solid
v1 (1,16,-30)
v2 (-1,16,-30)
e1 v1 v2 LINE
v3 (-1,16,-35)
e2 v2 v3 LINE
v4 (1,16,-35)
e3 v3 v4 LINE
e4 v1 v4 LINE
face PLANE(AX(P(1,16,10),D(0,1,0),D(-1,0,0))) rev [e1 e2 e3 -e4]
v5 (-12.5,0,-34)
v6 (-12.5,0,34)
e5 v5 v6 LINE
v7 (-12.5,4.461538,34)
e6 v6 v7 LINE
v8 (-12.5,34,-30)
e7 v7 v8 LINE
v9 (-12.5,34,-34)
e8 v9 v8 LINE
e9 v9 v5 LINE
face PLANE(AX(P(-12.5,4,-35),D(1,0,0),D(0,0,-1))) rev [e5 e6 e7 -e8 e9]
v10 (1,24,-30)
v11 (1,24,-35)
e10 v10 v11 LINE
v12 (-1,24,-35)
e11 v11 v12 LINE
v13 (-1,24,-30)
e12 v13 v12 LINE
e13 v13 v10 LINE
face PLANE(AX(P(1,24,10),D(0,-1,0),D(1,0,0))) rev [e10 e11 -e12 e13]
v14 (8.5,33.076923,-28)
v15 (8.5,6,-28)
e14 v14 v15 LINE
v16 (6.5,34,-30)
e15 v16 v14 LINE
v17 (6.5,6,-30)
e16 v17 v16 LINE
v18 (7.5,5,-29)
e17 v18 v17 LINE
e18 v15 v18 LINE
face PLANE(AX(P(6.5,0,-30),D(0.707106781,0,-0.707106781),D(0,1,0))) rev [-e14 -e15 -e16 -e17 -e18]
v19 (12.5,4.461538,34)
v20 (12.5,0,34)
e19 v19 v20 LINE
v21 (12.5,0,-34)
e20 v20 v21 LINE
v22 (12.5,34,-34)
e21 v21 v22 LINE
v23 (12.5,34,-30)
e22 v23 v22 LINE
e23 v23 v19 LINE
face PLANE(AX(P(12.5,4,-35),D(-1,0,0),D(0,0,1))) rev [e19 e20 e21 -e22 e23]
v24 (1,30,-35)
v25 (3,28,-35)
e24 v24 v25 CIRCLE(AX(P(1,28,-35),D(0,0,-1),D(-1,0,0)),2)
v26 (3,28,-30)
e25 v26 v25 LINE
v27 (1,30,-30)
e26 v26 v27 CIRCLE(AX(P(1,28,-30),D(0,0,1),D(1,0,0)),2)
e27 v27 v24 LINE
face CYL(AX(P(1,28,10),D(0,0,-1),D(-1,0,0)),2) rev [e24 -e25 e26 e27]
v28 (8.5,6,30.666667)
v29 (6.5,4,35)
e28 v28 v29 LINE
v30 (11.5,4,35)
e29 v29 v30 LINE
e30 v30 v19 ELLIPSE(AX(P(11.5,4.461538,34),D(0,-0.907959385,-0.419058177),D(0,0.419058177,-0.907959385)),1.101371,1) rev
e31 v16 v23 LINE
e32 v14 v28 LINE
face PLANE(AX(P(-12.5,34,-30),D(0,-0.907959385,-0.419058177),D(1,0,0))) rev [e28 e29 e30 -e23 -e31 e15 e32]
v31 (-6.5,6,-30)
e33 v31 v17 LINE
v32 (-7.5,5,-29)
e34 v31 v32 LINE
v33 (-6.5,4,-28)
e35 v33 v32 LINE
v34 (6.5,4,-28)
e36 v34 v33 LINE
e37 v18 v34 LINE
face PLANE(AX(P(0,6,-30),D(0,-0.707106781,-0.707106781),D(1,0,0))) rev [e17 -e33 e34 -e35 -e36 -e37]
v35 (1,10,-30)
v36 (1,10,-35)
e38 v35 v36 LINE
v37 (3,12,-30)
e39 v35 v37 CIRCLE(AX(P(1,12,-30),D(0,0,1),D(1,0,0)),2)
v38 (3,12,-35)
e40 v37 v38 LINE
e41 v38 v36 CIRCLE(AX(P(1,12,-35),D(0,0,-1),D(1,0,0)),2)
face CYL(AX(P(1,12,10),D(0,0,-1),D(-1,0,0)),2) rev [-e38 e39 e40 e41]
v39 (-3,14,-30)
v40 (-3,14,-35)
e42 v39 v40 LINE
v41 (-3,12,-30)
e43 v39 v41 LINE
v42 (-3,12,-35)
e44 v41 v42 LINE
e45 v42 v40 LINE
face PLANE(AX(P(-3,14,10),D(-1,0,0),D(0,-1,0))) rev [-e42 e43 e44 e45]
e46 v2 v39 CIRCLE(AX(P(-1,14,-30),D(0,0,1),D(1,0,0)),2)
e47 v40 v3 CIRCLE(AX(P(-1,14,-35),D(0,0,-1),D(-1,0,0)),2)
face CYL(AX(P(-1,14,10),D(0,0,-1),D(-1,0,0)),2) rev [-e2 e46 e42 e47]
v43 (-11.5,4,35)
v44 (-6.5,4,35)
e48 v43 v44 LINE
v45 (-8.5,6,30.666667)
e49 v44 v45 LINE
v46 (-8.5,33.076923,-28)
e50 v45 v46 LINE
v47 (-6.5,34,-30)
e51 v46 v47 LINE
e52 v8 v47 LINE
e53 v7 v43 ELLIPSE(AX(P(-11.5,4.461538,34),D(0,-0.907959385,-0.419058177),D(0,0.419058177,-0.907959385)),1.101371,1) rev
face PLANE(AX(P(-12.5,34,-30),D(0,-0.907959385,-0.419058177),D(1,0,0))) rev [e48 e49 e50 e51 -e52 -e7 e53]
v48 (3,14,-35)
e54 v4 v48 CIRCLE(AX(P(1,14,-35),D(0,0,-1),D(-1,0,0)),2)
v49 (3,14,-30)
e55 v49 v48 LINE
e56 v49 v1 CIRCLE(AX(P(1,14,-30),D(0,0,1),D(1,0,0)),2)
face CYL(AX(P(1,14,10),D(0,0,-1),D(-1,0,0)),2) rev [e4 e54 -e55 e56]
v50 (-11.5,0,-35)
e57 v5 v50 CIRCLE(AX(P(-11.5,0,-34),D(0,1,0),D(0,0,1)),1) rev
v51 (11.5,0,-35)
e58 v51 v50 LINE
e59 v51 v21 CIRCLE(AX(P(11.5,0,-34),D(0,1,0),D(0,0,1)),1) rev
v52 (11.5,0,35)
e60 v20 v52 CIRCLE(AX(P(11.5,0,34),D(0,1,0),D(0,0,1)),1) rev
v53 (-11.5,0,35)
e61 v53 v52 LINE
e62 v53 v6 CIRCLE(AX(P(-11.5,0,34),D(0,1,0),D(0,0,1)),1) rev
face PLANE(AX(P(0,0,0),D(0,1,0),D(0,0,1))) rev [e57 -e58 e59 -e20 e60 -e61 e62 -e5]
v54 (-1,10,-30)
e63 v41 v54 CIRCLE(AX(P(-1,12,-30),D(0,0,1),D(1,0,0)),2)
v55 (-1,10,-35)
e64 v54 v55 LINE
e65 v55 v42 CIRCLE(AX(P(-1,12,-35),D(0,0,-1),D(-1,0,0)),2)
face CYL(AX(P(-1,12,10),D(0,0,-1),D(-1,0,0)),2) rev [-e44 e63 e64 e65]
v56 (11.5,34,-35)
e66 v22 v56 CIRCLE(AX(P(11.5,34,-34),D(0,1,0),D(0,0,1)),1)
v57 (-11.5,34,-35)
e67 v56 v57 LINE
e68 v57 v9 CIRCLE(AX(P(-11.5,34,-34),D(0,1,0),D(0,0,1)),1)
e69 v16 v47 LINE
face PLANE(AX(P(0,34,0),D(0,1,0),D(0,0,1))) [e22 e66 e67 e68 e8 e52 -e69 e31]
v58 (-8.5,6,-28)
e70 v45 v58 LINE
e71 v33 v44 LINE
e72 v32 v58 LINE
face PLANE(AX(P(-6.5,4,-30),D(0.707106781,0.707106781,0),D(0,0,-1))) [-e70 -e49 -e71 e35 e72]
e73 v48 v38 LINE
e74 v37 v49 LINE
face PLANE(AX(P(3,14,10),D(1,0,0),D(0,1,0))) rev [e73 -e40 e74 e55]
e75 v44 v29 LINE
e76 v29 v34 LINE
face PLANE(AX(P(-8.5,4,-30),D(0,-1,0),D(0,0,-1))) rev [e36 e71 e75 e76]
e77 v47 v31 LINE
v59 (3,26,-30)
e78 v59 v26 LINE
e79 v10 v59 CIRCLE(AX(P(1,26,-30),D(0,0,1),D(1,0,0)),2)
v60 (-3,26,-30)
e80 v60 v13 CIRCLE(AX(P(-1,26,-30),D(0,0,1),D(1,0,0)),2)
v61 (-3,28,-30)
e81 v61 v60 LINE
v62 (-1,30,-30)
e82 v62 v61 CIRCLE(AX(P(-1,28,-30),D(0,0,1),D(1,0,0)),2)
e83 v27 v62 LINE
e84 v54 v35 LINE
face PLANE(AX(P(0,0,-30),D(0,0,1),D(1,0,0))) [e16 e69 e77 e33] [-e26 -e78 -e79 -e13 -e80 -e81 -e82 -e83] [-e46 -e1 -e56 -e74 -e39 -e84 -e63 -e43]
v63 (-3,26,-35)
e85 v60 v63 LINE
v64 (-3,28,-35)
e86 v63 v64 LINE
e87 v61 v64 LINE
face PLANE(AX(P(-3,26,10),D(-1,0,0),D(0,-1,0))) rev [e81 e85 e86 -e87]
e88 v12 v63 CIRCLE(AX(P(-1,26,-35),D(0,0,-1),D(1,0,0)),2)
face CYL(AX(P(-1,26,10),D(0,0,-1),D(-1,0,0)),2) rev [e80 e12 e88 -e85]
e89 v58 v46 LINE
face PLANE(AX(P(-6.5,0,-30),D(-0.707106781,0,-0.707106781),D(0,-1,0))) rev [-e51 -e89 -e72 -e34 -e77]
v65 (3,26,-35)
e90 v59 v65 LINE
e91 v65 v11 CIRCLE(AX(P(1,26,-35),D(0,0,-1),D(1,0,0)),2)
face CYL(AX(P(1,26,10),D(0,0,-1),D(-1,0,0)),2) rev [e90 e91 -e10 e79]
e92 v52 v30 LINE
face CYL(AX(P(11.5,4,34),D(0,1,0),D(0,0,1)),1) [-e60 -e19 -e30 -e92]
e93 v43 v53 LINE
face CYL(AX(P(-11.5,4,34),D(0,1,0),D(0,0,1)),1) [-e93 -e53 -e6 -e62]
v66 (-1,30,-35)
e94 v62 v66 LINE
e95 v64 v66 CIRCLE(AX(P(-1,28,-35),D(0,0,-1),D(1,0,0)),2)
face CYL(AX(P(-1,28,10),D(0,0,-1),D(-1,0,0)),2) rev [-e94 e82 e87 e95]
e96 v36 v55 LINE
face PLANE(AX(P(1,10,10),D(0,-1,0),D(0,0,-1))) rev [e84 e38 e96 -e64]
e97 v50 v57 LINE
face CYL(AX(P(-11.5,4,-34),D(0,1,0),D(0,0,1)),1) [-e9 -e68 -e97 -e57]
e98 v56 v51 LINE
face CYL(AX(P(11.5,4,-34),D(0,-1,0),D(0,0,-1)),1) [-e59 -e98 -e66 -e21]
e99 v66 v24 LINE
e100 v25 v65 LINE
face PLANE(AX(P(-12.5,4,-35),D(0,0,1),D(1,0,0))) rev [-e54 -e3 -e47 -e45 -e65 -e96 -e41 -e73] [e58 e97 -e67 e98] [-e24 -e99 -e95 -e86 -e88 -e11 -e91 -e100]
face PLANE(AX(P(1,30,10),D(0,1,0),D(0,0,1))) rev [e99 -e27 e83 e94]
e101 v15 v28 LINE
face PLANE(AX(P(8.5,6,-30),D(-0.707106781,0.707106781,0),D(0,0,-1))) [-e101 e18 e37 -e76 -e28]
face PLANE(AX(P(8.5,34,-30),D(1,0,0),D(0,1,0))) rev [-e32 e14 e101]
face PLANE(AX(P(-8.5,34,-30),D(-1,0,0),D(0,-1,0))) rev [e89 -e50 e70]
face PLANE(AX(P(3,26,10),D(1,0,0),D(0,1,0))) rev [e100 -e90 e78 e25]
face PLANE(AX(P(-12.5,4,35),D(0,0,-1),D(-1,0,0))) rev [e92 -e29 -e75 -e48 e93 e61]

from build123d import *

# Parameters (mm, degrees)
ESBO_O1_W               = 25
ESBO_O1_H               = 70
BASE_DEPTH              = 4
ESBO_O2_W               = 25
ESBO_O2_H               = 5
PAREDE_DO_FUNDO_DEPTH   = 30
PAREDES_START           = -12.5
PAREDES_LATERAIS_DEPTH  = 25
ESBO_O3_W               = 17
ESBO_O3_H               = 30
CORTE_NAS_PAREDES_DEPTH = 65
CHANFRO3_SIZE           = 2
CHANFRO4_SIZE           = 2
CHANFRO5_SIZE           = 2
CHANFRO6_SIZE           = 2
CHANFRO7_SIZE           = 2
PARAFUSO_DEPTH          = 45
FILETE1_R               = 1
FILETE2_R               = 1
FILETE3_R               = 1
FILETE4_R               = 1


with BuildPart() as part:
    # Esboço1 → Base (new body)
    with BuildSketch(Plane(origin=(0, 0, 0), x_dir=(1, 0, 0), z_dir=(0, 1, 0))):
        Rectangle(ESBO_O1_W, ESBO_O1_H)
    extrude(amount=BASE_DEPTH)

    # Esboço2 → Parede do fundo (add)
    with BuildSketch(Plane(origin=(0, 4, 0), x_dir=(1, 0, 0), z_dir=(0, 1, 0))):
        with Locations((0, 32.5)):
            Rectangle(ESBO_O2_W, ESBO_O2_H)
    extrude(amount=PAREDE_DO_FUNDO_DEPTH)

    # Paredes Laterais: read off the stored shape, not the designer's step
    # Paredes Laterais outline → Paredes Laterais (add)
    with BuildSketch(Plane.YZ.offset(PAREDES_START)):
        Polygon((34, -30), (4, 35), (4, -30), align=None)
    extrude(amount=PAREDES_LATERAIS_DEPTH)

    # Esboço3 → Corte nas Paredes (cut)
    with BuildSketch(Plane.XY.offset(35)):
        with Locations((0, 19)):
            Rectangle(ESBO_O3_W, ESBO_O3_H)
    extrude(amount=-CORTE_NAS_PAREDES_DEPTH, mode=Mode.SUBTRACT)

    # Chanfro3
    chanfro3_edges = [part.edges().sort_by_distance(p)[0] for p in [
        (-8.5, 4, 2.5),
    ]]
    chamfer(chanfro3_edges, length=CHANFRO3_SIZE)

    # Chanfro4
    chanfro4_edges = [part.edges().sort_by_distance(p)[0] for p in [
        (8.5, 4, 2.5),
    ]]
    chamfer(chanfro4_edges, length=CHANFRO4_SIZE)

    # Chanfro5
    chanfro5_edges = [part.edges().sort_by_distance(p)[0] for p in [
        (0, 4, -30),
    ]]
    chamfer(chanfro5_edges, length=CHANFRO5_SIZE)

    # Chanfro6
    chanfro6_edges = [part.edges().sort_by_distance(p)[0] for p in [
        (-8.5, 20, -30),
    ]]
    chamfer(chanfro6_edges, length=CHANFRO6_SIZE)

    # Chanfro7
    chanfro7_edges = [part.edges().sort_by_distance(p)[0] for p in [
        (8.5, 20, -30),
    ]]
    chamfer(chanfro7_edges, length=CHANFRO7_SIZE)

    # Esboço4 → Parafuso (cut)
    with BuildSketch(Plane(origin=(0, 0, -35), x_dir=(-1, 0, 0), z_dir=(0, 0, -1))):
        with BuildLine():
            Line((-1, 16), (1, 16))
            ThreePointArc((1, 16), (2.414213562, 15.414213562), (3, 14))
            Line((3, 14), (3, 12))
            ThreePointArc((3, 12), (2.414213562, 10.585786438), (1, 10))
            Line((1, 10), (-1, 10))
            ThreePointArc((-1, 10), (-2.414213562, 10.585786438), (-3, 12))
            Line((-3, 12), (-3, 14))
            ThreePointArc((-3, 14), (-2.414213562, 15.414213562), (-1, 16))
        make_face()
        with BuildLine():
            Line((-3, 26), (-3, 28))
            ThreePointArc((-3, 28), (-2.414213562, 29.414213562), (-1, 30))
            Line((-1, 30), (1, 30))
            ThreePointArc((1, 30), (2.414213562, 29.414213562), (3, 28))
            Line((3, 28), (3, 26))
            ThreePointArc((3, 26), (2.414213562, 24.585786438), (1, 24))
            Line((1, 24), (-1, 24))
            ThreePointArc((-1, 24), (-2.414213562, 24.585786438), (-3, 26))
        make_face()
    extrude(amount=-PARAFUSO_DEPTH, mode=Mode.SUBTRACT)

    # Filete1
    filete1_edges = [part.edges().sort_by_distance(p)[0] for p in [
        (12.5, 17, -35),
    ]]
    fillet(filete1_edges, radius=FILETE1_R)

    # Filete2
    filete2_edges = [part.edges().sort_by_distance(p)[0] for p in [
        (-12.5, 17, -35),
    ]]
    fillet(filete2_edges, radius=FILETE2_R)

    # Filete3
    filete3_edges = [part.edges().sort_by_distance(p)[0] for p in [
        (12.5, 2, 35),
    ]]
    fillet(filete3_edges, radius=FILETE3_R)

    # Filete4
    filete4_edges = [part.edges().sort_by_distance(p)[0] for p in [
        (-12.5, 2, 35),
    ]]
    fillet(filete4_edges, radius=FILETE4_R)


solid = part.part
